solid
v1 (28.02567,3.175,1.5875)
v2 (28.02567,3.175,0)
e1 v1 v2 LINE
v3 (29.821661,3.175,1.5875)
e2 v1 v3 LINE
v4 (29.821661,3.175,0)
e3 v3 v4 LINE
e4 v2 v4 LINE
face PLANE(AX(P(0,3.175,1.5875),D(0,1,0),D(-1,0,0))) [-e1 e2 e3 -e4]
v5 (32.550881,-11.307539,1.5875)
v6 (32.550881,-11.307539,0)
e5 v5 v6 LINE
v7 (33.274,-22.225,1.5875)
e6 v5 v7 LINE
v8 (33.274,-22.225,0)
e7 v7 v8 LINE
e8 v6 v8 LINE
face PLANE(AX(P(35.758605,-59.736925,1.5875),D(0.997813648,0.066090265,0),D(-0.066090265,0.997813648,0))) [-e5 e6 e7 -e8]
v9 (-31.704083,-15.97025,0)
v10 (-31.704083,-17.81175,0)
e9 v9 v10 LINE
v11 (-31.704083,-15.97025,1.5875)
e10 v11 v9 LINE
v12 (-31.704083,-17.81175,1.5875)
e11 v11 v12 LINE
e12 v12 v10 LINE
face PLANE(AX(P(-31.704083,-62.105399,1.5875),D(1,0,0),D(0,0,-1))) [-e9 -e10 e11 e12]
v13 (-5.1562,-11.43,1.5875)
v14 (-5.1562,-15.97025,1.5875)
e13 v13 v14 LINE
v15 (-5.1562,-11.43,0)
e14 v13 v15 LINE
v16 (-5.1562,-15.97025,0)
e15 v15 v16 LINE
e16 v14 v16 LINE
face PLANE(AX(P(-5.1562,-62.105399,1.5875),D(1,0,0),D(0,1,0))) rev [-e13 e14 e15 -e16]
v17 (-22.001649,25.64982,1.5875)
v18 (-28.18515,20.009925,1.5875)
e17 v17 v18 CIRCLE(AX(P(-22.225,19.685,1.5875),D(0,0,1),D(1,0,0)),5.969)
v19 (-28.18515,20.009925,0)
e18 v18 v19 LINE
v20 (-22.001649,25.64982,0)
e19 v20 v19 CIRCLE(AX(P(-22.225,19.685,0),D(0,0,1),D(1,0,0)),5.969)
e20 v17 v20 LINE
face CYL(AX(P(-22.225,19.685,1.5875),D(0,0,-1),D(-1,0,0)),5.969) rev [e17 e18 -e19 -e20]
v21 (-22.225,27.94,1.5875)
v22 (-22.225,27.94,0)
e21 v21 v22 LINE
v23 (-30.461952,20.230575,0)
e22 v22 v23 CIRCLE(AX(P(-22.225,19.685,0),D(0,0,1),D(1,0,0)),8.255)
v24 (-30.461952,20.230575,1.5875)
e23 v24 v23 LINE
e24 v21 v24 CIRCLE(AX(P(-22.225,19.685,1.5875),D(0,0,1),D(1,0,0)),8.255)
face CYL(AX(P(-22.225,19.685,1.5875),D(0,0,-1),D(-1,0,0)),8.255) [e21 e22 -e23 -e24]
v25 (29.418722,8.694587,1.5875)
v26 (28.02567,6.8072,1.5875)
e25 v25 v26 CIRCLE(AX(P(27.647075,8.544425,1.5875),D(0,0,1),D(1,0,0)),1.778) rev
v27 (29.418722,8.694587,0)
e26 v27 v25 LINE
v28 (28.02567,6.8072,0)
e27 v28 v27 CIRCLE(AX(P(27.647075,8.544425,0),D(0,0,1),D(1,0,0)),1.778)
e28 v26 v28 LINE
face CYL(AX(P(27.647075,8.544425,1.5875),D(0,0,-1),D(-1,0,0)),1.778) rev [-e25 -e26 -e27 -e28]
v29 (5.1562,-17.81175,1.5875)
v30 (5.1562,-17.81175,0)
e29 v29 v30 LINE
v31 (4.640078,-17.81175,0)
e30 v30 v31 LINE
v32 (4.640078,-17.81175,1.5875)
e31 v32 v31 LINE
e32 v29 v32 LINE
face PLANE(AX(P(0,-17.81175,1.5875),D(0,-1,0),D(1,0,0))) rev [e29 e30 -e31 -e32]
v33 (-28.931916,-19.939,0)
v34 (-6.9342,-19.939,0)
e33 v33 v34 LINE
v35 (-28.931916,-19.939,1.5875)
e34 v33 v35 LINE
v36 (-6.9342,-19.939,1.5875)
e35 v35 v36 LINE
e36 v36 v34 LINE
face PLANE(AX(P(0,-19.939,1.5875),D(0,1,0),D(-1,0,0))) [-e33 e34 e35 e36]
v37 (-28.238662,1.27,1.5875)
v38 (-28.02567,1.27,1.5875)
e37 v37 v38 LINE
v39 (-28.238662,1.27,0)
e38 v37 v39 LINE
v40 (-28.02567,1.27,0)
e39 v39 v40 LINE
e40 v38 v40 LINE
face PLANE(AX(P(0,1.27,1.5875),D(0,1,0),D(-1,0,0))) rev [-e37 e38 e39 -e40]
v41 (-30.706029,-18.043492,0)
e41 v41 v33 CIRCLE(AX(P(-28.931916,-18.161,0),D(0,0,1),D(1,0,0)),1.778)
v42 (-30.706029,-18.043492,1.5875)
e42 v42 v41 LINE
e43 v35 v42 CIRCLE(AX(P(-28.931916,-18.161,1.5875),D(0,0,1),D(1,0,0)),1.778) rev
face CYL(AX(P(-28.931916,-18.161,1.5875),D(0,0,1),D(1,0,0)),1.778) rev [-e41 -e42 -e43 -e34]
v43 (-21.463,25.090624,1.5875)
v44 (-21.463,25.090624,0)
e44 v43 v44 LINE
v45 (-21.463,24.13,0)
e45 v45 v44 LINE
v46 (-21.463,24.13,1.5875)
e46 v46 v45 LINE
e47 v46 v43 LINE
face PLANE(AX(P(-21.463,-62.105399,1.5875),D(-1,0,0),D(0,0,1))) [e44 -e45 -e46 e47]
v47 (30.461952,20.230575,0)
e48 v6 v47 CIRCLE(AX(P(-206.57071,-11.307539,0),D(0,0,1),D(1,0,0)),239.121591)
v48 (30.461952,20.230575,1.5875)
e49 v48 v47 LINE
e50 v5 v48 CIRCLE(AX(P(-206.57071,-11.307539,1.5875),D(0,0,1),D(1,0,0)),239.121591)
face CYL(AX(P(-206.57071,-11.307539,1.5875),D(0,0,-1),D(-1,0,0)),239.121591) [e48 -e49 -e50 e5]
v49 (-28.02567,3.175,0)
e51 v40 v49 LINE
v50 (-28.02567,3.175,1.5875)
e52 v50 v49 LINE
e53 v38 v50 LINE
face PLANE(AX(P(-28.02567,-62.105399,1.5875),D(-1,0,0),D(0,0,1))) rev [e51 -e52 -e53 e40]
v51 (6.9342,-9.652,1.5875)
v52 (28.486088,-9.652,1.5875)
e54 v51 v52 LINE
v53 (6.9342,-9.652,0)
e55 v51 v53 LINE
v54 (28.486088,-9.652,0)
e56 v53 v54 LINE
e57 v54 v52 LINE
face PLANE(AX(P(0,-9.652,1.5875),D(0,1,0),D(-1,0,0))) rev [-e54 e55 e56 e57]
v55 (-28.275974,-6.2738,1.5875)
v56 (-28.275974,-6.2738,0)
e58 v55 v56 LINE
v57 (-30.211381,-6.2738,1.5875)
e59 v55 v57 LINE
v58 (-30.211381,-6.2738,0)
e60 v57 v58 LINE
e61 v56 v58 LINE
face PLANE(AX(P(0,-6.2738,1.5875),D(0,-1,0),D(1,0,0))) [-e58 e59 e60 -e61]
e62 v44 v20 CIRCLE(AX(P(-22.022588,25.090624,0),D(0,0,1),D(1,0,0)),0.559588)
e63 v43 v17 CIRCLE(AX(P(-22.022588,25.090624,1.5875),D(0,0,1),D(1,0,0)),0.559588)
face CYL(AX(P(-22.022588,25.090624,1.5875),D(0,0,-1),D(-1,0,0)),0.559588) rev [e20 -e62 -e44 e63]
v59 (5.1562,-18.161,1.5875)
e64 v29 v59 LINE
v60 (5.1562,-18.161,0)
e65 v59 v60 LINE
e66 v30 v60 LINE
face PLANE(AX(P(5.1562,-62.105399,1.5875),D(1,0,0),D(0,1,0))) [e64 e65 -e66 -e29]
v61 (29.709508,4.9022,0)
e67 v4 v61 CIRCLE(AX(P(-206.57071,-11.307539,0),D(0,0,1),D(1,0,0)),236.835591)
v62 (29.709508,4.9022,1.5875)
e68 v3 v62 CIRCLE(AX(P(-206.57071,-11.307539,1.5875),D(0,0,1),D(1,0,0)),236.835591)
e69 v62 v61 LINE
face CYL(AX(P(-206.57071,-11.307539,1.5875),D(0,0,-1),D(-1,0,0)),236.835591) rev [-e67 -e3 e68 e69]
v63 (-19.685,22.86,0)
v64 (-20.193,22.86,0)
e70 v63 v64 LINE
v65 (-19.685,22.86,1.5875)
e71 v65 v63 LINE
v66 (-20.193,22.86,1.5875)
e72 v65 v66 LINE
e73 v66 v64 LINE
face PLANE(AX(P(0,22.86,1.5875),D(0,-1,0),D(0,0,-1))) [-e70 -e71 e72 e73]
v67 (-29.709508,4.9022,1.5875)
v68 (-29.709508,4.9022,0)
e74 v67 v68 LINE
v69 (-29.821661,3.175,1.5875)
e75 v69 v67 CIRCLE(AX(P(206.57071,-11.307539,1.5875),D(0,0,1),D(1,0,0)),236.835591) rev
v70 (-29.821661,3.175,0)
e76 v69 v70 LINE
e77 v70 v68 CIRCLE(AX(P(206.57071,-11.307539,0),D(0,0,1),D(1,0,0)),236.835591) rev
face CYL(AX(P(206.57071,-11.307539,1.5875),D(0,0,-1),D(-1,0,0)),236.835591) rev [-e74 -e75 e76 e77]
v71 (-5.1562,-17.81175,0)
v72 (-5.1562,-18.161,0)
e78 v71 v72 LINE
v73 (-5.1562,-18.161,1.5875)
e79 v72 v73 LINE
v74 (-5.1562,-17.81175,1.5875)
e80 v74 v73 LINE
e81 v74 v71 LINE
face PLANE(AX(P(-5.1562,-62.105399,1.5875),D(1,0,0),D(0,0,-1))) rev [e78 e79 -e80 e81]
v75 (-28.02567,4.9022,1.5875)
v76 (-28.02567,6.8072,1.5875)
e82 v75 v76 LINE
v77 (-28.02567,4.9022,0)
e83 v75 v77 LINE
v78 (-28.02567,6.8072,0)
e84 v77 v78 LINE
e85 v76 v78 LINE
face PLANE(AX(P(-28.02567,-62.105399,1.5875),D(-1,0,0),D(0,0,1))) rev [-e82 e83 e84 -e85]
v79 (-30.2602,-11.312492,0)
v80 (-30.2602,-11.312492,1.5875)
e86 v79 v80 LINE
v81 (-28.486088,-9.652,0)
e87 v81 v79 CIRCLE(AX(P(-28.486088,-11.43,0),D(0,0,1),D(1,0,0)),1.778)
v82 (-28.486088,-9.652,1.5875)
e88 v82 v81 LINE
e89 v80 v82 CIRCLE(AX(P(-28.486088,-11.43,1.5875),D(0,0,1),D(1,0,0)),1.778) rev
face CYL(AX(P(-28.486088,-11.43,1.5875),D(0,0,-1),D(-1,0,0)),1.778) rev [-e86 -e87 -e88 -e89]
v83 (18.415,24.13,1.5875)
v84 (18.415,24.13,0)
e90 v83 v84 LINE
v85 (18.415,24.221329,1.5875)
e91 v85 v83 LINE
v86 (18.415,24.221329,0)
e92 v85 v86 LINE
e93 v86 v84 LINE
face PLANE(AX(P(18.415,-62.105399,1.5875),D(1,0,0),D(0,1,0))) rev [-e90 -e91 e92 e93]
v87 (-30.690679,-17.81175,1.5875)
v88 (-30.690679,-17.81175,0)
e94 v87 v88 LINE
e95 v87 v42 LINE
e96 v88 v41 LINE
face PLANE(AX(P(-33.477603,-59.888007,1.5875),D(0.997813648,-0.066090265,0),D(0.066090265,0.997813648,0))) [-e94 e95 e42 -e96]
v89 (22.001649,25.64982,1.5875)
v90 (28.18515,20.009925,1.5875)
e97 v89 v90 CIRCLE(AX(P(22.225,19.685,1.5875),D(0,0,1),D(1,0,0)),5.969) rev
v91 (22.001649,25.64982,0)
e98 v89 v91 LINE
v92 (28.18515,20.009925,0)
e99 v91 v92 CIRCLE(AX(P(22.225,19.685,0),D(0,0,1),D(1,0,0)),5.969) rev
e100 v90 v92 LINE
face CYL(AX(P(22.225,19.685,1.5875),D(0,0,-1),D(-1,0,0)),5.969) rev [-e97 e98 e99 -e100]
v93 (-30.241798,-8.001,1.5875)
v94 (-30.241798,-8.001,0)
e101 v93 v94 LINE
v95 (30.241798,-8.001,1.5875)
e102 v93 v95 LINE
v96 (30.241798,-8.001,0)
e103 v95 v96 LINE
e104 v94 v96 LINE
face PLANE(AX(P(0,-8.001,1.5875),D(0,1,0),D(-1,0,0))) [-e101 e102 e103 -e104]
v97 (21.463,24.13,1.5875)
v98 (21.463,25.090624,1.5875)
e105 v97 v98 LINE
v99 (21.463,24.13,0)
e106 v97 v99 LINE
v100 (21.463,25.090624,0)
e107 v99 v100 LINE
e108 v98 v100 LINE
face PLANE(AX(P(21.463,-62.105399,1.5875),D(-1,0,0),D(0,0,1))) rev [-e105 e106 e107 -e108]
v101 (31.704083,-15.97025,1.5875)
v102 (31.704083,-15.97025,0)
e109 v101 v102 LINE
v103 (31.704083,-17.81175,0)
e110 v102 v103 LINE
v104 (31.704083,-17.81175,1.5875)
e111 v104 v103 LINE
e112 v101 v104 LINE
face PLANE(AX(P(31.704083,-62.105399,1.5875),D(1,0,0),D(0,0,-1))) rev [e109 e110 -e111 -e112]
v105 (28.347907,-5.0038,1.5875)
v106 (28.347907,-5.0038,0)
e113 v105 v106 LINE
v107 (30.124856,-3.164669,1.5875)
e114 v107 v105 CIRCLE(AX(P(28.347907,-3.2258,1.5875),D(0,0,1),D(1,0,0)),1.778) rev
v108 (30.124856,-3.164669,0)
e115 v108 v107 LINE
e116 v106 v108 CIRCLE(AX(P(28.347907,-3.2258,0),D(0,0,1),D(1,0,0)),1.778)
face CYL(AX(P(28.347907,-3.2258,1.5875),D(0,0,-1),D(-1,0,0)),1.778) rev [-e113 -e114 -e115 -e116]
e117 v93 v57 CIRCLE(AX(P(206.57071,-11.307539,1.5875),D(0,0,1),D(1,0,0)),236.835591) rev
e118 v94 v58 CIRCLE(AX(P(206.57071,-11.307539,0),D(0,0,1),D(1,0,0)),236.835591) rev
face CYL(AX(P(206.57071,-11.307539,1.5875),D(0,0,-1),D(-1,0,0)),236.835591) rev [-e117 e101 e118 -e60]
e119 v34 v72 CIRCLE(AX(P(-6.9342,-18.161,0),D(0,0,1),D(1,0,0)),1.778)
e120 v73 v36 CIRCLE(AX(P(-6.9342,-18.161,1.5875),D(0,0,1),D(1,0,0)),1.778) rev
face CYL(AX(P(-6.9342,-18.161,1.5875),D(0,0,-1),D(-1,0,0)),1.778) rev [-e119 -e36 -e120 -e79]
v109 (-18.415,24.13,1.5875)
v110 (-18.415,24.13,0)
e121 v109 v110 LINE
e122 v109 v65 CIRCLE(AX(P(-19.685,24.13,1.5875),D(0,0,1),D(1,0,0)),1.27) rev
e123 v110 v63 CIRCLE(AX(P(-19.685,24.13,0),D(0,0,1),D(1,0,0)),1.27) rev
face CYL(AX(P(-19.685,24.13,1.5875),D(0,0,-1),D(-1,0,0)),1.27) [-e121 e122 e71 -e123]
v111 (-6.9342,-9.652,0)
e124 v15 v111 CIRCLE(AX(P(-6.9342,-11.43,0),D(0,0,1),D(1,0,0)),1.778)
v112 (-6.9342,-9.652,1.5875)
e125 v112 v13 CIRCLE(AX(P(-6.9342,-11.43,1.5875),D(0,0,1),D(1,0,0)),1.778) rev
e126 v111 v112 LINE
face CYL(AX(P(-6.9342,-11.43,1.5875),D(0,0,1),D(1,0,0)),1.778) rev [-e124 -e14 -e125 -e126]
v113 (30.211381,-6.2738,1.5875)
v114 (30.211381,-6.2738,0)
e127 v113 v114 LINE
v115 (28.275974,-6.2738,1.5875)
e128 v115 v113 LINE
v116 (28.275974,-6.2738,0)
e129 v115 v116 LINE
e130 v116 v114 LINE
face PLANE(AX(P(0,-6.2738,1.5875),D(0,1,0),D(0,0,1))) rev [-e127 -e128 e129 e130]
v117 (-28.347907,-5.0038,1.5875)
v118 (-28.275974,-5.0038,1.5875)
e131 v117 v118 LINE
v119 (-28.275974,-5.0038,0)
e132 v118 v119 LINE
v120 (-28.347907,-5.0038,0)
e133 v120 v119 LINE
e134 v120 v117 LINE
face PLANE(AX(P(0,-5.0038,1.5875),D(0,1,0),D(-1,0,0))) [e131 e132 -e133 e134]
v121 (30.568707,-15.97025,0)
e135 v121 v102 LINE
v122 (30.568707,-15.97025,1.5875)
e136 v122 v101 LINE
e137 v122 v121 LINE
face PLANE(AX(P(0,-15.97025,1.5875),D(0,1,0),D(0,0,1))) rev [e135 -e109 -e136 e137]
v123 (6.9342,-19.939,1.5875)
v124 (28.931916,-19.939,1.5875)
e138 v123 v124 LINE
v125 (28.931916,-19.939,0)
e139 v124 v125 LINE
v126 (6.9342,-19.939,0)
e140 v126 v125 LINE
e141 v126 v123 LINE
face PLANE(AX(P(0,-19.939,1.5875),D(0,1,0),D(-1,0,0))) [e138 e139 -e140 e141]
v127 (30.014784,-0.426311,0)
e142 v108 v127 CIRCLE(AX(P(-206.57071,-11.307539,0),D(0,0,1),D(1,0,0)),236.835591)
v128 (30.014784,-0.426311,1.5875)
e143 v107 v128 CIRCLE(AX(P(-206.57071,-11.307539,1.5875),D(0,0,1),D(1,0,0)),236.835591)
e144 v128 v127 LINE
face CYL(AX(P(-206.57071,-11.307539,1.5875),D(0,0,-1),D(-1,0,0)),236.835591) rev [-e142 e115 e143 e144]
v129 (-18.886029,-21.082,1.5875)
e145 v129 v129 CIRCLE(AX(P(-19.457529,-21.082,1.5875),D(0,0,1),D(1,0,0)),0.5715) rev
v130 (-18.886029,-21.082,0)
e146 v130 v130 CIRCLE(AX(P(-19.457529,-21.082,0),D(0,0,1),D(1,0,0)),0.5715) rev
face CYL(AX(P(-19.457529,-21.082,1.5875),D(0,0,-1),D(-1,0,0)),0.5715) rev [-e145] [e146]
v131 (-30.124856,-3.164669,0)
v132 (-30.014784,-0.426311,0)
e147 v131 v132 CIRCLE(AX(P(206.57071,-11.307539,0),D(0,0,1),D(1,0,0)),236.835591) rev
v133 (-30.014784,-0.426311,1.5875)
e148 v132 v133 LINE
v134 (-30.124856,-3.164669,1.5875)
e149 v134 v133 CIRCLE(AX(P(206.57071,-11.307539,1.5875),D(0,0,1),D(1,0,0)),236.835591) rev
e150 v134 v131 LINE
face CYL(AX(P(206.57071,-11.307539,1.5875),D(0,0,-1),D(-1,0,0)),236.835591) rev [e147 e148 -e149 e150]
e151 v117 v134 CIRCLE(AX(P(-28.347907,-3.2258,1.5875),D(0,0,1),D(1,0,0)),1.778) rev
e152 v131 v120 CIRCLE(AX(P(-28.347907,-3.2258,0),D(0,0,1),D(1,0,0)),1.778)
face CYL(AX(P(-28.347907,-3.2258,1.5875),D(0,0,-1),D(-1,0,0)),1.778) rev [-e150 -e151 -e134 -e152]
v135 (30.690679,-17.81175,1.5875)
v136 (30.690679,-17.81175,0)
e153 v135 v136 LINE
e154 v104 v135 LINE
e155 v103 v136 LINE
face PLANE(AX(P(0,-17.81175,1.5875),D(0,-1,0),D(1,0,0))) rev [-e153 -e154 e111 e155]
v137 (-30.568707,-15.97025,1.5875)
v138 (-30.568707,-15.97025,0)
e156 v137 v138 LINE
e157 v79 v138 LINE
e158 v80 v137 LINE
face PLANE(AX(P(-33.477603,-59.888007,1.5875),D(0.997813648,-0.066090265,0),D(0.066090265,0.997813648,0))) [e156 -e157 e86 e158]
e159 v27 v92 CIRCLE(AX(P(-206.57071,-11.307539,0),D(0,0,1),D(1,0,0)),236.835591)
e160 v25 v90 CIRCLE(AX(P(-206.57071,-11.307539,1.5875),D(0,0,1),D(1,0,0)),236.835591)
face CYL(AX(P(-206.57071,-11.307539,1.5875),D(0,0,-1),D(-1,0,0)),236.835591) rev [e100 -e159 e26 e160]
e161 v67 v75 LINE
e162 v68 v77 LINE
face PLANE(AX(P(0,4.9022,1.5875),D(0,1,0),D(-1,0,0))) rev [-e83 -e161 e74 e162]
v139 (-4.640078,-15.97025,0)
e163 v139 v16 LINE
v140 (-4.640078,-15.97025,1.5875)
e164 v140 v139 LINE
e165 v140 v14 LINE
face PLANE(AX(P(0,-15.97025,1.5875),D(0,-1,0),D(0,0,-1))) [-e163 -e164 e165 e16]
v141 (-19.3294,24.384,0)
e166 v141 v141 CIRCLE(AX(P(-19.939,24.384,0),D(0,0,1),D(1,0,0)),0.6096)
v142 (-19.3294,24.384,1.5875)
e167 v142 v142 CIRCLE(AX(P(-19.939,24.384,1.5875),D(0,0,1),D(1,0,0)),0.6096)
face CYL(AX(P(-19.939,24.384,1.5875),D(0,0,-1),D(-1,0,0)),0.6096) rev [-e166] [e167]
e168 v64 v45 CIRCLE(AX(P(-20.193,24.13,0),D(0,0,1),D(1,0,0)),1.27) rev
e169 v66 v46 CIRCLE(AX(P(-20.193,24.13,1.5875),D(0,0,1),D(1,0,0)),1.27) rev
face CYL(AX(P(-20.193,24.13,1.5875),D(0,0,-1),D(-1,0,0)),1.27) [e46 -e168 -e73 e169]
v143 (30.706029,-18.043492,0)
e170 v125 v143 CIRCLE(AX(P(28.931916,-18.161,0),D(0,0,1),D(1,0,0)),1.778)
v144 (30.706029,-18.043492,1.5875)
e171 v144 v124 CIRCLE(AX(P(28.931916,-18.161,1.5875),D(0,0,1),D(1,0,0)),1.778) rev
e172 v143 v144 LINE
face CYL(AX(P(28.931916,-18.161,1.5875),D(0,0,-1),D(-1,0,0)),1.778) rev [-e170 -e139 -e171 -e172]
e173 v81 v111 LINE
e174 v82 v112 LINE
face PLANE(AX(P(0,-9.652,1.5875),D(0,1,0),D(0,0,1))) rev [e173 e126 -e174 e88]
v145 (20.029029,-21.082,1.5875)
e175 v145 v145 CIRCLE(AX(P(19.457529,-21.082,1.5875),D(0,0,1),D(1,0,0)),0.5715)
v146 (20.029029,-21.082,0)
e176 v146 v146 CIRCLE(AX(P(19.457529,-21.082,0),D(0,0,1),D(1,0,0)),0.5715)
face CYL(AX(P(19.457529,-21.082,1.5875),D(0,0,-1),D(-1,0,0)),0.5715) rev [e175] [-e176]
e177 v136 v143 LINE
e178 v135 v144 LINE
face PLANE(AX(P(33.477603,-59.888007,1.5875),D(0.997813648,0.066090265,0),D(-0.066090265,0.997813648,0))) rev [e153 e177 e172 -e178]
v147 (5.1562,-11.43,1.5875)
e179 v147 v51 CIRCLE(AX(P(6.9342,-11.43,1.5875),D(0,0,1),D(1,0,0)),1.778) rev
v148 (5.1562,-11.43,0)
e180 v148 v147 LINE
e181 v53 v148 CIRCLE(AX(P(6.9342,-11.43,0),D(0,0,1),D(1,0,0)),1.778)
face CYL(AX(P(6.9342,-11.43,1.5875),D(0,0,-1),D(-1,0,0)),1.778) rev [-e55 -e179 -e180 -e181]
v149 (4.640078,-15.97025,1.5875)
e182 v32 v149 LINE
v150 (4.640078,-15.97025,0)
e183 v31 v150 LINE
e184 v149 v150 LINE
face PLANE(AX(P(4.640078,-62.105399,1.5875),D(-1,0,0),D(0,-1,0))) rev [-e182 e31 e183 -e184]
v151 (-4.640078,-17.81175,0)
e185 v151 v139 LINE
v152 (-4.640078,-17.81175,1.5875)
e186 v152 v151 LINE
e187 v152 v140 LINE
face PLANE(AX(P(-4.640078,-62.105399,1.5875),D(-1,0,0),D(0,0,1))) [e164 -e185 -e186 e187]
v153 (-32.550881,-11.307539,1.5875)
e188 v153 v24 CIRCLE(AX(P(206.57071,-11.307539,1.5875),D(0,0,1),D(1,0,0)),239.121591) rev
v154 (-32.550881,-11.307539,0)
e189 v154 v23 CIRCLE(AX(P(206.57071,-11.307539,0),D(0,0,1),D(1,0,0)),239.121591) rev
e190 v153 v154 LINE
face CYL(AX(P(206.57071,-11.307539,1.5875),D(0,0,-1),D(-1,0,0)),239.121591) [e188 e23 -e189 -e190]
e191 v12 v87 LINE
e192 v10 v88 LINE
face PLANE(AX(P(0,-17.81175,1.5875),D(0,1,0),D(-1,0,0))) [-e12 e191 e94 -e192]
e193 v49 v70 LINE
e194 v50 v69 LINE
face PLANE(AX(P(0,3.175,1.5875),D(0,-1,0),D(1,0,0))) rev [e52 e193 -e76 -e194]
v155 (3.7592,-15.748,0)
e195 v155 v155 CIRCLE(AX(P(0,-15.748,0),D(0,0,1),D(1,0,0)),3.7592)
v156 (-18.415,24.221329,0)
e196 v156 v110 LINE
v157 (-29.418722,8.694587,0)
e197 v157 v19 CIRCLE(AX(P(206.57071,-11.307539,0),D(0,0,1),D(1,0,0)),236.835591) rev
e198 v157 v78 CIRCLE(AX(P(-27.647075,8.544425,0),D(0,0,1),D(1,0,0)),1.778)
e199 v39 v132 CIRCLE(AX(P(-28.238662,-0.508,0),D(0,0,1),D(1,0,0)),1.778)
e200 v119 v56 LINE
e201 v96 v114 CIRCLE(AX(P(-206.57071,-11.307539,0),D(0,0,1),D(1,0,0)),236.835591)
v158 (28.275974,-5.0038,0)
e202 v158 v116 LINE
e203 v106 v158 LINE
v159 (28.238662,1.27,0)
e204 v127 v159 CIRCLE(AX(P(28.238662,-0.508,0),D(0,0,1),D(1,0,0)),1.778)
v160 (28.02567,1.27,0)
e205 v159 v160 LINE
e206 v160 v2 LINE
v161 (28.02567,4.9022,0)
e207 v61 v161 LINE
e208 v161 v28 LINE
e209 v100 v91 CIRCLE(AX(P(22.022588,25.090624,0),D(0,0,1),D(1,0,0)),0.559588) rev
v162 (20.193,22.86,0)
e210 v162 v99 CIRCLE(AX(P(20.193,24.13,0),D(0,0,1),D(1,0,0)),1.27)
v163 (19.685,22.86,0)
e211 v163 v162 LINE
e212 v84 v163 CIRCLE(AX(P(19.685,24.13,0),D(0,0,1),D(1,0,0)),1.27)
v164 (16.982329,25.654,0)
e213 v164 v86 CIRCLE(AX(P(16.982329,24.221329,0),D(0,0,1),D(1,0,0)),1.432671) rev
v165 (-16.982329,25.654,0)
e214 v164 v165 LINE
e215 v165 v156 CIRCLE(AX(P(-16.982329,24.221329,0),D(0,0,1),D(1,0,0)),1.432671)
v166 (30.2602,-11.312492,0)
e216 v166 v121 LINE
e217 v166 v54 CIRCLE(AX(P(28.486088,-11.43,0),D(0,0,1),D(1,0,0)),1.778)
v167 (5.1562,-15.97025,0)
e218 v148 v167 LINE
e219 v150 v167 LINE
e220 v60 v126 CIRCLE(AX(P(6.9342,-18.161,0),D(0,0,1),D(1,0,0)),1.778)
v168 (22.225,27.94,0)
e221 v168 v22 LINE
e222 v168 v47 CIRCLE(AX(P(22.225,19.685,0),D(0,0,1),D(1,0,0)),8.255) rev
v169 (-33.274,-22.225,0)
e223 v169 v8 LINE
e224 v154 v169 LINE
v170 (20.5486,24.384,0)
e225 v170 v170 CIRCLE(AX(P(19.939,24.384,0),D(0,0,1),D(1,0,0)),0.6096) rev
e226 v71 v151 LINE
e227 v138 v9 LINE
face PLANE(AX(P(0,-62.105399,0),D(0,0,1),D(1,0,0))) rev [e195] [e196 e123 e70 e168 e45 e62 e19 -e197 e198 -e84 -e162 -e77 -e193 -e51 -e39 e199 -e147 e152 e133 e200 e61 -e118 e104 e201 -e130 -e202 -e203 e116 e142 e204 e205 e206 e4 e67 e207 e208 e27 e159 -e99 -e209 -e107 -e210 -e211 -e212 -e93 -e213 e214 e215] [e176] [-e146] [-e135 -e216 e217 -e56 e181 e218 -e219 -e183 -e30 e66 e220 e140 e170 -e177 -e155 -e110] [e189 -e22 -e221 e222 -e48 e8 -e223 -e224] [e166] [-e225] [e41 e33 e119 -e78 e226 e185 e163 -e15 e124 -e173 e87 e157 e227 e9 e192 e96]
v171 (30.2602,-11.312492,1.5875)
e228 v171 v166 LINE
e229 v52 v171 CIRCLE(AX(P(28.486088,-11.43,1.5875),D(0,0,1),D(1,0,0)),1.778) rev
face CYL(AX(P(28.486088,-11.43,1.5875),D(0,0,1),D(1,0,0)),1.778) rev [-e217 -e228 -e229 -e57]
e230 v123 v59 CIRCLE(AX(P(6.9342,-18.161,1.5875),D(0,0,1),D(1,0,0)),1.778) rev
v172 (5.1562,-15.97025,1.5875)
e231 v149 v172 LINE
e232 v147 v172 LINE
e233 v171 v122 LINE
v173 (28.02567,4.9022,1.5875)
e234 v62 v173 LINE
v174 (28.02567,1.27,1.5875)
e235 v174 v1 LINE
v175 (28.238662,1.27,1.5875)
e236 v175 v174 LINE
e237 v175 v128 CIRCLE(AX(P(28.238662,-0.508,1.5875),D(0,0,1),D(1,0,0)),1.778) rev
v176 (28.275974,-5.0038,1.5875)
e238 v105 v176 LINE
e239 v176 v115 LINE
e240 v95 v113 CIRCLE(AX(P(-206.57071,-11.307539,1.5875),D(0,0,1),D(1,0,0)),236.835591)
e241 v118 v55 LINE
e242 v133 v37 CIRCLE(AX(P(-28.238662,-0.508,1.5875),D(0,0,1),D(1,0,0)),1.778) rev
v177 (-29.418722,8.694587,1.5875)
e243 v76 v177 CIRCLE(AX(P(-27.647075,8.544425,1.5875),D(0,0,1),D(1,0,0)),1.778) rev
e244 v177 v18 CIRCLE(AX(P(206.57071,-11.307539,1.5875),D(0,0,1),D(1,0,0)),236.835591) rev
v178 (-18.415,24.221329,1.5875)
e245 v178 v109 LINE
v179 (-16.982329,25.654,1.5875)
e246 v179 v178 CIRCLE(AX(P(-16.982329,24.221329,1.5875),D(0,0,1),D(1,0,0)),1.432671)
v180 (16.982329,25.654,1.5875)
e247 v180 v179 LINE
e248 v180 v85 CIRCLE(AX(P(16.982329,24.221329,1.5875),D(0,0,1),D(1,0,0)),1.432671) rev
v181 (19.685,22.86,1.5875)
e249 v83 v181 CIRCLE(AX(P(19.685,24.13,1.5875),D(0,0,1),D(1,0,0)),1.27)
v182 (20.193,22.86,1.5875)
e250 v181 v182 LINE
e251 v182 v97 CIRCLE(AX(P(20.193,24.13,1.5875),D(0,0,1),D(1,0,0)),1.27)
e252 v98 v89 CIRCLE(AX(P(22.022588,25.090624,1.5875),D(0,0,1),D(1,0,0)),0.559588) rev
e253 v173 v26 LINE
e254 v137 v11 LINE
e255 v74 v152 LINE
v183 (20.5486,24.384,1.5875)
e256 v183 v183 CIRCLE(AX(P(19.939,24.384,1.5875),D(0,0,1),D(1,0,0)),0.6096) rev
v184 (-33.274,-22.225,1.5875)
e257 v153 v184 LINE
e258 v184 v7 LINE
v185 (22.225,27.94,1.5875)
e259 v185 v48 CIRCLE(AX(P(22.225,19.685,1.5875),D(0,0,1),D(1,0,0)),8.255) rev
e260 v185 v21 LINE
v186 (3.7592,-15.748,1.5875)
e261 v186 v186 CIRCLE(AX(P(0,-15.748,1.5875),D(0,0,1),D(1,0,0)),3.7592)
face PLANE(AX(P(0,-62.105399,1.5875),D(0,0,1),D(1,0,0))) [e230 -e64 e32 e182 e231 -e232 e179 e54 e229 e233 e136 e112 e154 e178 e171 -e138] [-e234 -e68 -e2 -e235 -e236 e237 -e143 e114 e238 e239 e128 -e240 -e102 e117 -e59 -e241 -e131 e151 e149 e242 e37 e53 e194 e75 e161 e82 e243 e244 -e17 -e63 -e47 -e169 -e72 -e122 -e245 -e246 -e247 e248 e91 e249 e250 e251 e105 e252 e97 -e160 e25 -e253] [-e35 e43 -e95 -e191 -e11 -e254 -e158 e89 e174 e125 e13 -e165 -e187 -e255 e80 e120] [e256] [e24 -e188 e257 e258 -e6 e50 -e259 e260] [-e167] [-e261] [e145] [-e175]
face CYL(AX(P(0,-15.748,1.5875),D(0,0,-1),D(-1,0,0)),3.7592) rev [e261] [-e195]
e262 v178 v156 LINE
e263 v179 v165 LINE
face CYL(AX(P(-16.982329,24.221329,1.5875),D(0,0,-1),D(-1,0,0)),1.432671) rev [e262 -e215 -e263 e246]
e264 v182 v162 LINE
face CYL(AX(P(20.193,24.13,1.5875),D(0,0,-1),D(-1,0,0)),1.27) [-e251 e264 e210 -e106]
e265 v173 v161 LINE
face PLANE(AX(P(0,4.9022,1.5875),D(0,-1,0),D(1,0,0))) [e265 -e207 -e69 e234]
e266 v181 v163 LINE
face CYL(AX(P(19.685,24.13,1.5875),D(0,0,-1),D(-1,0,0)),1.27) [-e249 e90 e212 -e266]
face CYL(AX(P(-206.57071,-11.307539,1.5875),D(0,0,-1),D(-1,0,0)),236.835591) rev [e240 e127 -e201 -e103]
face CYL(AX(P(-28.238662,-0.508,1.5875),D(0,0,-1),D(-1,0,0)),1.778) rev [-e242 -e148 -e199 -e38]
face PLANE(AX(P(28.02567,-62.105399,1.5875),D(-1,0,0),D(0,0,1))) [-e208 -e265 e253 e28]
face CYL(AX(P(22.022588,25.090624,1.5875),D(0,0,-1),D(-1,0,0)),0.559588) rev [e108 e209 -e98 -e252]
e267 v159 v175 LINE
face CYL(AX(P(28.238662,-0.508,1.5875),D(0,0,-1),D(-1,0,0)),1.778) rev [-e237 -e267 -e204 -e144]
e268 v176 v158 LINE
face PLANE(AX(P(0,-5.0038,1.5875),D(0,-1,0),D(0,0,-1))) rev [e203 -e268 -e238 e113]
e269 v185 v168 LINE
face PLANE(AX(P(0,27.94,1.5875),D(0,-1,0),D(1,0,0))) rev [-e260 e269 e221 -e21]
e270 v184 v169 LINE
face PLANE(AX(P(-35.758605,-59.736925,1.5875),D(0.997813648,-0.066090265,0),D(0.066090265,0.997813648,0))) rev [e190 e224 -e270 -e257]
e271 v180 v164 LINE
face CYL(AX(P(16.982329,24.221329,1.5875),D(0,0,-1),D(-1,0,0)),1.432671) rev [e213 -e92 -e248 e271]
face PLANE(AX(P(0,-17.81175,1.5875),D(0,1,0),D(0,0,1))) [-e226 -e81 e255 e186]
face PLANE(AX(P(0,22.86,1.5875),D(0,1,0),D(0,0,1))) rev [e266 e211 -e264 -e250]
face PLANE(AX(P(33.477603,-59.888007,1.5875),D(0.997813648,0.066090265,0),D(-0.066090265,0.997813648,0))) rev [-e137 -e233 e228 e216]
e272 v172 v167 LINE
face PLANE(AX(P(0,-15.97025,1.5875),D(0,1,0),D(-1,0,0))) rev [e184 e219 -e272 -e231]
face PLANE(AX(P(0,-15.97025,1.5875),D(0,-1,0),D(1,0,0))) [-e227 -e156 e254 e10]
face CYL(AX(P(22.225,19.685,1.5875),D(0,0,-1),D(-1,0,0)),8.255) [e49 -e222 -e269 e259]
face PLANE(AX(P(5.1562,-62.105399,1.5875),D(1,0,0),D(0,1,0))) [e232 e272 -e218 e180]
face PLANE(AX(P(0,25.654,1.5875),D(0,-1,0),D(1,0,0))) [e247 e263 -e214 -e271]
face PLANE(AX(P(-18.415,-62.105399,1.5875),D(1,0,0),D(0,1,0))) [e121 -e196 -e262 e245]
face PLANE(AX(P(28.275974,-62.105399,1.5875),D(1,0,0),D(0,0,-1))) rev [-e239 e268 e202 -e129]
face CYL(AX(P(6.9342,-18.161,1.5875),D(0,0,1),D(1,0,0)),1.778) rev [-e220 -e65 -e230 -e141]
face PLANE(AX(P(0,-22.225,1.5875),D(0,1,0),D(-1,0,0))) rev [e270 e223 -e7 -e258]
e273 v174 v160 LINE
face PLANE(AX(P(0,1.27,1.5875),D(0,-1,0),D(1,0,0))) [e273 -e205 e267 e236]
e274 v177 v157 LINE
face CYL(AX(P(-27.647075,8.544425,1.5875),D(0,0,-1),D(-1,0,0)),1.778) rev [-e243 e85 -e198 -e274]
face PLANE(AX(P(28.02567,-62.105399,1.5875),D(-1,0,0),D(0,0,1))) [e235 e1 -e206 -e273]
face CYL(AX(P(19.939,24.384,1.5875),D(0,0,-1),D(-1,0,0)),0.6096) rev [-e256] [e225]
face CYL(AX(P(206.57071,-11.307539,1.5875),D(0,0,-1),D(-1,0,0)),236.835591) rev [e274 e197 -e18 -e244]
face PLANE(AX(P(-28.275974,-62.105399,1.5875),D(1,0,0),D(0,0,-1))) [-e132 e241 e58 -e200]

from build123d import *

# Parameters (mm, degrees)
SKETCH1_R           = 3.7592
SKETCH1_R_2         = 0.5715
SKETCH1_R_3         = 0.6096
BOSS_EXTRUDE1_DEPTH = 1.5875
FILLET1_R           = 1.778


with BuildPart() as part:
    # Sketch1 → Boss-Extrude1 (new body)
    with BuildSketch(Plane.XY):
        with BuildLine():
            Line((32.550881113, -11.307538914), (33.274, -22.225))
            Line((33.274, -22.225), (-33.274, -22.225))
            Line((-33.274, -22.225), (-32.550881113, -11.307538914))
            ThreePointArc((-32.550881113, -11.307538914), (-32.028077235, 4.496070358), (-30.461951667, 20.230575137))
            ThreePointArc((-30.461951667, 20.230575137), (-27.865979624, 25.711970539), (-22.225, 27.94))
            Line((-22.225, 27.94), (22.225, 27.94))
            ThreePointArc((22.225, 27.94), (27.865979624, 25.711970539), (30.461951667, 20.230575137))
            ThreePointArc((30.461951667, 20.230575137), (32.028077235, 4.496070358), (32.550881113, -11.307538914))
        make_face()
        with Locations((0, -15.748)):
            Circle(SKETCH1_R, mode=Mode.SUBTRACT)
        with Locations((19.457528855, -21.082)):
            Circle(SKETCH1_R_2, mode=Mode.SUBTRACT)
        with Locations((-19.939, 24.384)):
            Circle(SKETCH1_R_3, mode=Mode.SUBTRACT)
        with Locations((19.939, 24.384)):
            Circle(SKETCH1_R_3, mode=Mode.SUBTRACT)
        with Locations((-19.457528855, -21.082)):
            Circle(SKETCH1_R_2, mode=Mode.SUBTRACT)
        with BuildLine():
            Line((16.982329273, 25.654), (-16.982329273, 25.654))
            ThreePointArc((-16.982329273, 25.654), (-17.995380459, 25.234380459), (-18.415, 24.221329273))
            Line((-18.415, 24.221329273), (-18.415, 24.13))
            ThreePointArc((-18.415, 24.13), (-18.786974388, 23.231974388), (-19.685, 22.86))
            Line((-19.685, 22.86), (-20.193, 22.86))
            ThreePointArc((-20.193, 22.86), (-21.091025612, 23.231974388), (-21.463, 24.13))
            Line((-21.463, 24.13), (-21.463, 25.09062388))
            ThreePointArc((-21.463, 25.09062388), (-21.619564426, 25.478838601), (-22.001648865, 25.649819802))
            ThreePointArc((-22.001648865, 25.649819802), (-26.24741448, 24.095118224), (-28.185149732, 20.00992487))
            ThreePointArc((-28.185149732, 20.00992487), (-28.97064802, 13.418275107), (-29.571097928, 6.8072))
            Line((-29.571097928, 6.8072), (-28.02566998, 6.8072))
            Line((-28.02566998, 6.8072), (-28.02566998, 4.9022))
            Line((-28.02566998, 4.9022), (-29.709508346, 4.9022))
            ThreePointArc((-29.709508346, 4.9022), (-29.767162744, 4.038702455), (-29.821661459, 3.175))
            Line((-29.821661459, 3.175), (-28.02566998, 3.175))
            Line((-28.02566998, 3.175), (-28.02566998, 1.27))
            Line((-28.02566998, 1.27), (-29.93066998, 1.27))
            ThreePointArc((-29.93066998, 1.27), (-30.076613863, -1.86607048), (-30.180974457, -5.0038))
            Line((-30.180974457, -5.0038), (-28.275974457, -5.0038))
            Line((-28.275974457, -5.0038), (-28.275974457, -6.2738))
            Line((-28.275974457, -6.2738), (-30.211381152, -6.2738))
            ThreePointArc((-30.211381152, -6.2738), (-30.228164423, -7.137372267), (-30.241798154, -8.001))
            Line((-30.241798154, -8.001), (30.241798154, -8.001))
            ThreePointArc((30.241798154, -8.001), (30.228164423, -7.137372267), (30.211381152, -6.2738))
            Line((30.211381152, -6.2738), (28.275974457, -6.2738))
            Line((28.275974457, -6.2738), (28.275974457, -5.0038))
            Line((28.275974457, -5.0038), (30.180974457, -5.0038))
            ThreePointArc((30.180974457, -5.0038), (30.076613863, -1.86607048), (29.93066998, 1.27))
            Line((29.93066998, 1.27), (28.02566998, 1.27))
            Line((28.02566998, 1.27), (28.02566998, 3.175))
            Line((28.02566998, 3.175), (29.821661459, 3.175))
            ThreePointArc((29.821661459, 3.175), (29.767162744, 4.038702455), (29.709508346, 4.9022))
            Line((29.709508346, 4.9022), (28.02566998, 4.9022))
            Line((28.02566998, 4.9022), (28.02566998, 6.8072))
            Line((28.02566998, 6.8072), (29.571097928, 6.8072))
            ThreePointArc((29.571097928, 6.8072), (28.97064802, 13.418275107), (28.185149732, 20.00992487))
            ThreePointArc((28.185149732, 20.00992487), (26.24741448, 24.095118224), (22.001648865, 25.649819802))
            ThreePointArc((22.001648865, 25.649819802), (21.619564426, 25.478838601), (21.463, 25.09062388))
            Line((21.463, 25.09062388), (21.463, 24.13))
            ThreePointArc((21.463, 24.13), (21.091025612, 23.231974388), (20.193, 22.86))
            Line((20.193, 22.86), (19.685, 22.86))
            ThreePointArc((19.685, 22.86), (18.786974388, 23.231974388), (18.415, 24.13))
            Line((18.415, 24.13), (18.415, 24.221329273))
            ThreePointArc((18.415, 24.221329273), (17.995380459, 25.234380459), (16.982329273, 25.654))
        make_face(mode=Mode.SUBTRACT)
        Polygon((30.150217413, -9.652), (30.568707194, -15.97025), (30.330164629, -15.97025), (31.704083289, -15.97025), (31.704083289, -17.81175), (30.690679091, -17.81175), (30.83157766, -19.939), (19.965528855, -19.939), (18.949528855, -19.939), (5.1562, -19.939), (5.1562, -17.81175), (4.640078489, -17.81175), (4.640078489, -15.97025), (5.1562, -15.97025), (5.1562, -9.652), align=None, mode=Mode.SUBTRACT)
        Polygon((-30.83157766, -19.939), (-19.965528855, -19.939), (-18.949528855, -19.939), (-5.1562, -19.939), (-5.1562, -17.81175), (-4.640078489, -17.81175), (-4.640078489, -15.97025), (-5.1562, -15.97025), (-5.1562, -9.652), (-30.150217413, -9.652), (-30.568707194, -15.97025), (-31.704083289, -15.97025), (-31.704083289, -17.81175), (-30.690679091, -17.81175), align=None, mode=Mode.SUBTRACT)
    extrude(amount=BOSS_EXTRUDE1_DEPTH)

    # Fillet1
    # the kernel refuses this fillet: 1.778 mm, written as the material it adds along each edge
    with BuildSketch(Plane(origin=(-30.180974457, -5.0038, 0), x_dir=(1, 0, 0), z_dir=(0, 0, 1))) as fillet1_piece_1:
        with BuildLine():
            CenterArc((1.833067409, 1.778), FILLET1_R, 178.029670908, 91.970329092)
            Line((0.056118624, 1.839131111), (0.020579648, 1.840353734))
            ThreePointArc((0.020579648, 1.840353734), (-0.009270189, 0.920704615), (-0.035547402, 0.000946483))
            Line((-0.035547402, 0.000946483), (0, -0.03556))
            Line((0, -0.03556), (1.833067409, -0.03556))
            Line((1.833067409, -0.03556), (1.833067409, 0))
        make_face()
    extrude(amount=1.5875)
    with BuildSketch(Plane(origin=(-29.93066998, 1.27, 0), x_dir=(-0.04952574354141493, -0.9987728474115973, 0), z_dir=(0, 0, 1))) as fillet1_piece_2:
        with BuildLine():
            CenterArc((1.692020161, 1.777988571), FILLET1_R, 182.838777382, 87.366662802)
            Line((-0.083797962, 1.689931798), (-0.119314324, 1.688170663))
            Line((-0.119314324, 1.688170663), (-0.035516362, -0.001761135))
            Line((-0.035516362, -0.001761135), (-0.000127504, -0.035559771))
            ThreePointArc((-0.000127504, -0.035559771), (0.849197679, -0.037082446), (1.698522862, -0.035559771))
            Line((1.698522862, -0.035559771), (1.698395358, 0))
        make_face()
    extrude(amount=1.5875)
    with BuildSketch(Plane(origin=(-29.571097928, 6.8072, 0), x_dir=(1, 0, 0), z_dir=(0, 0, 1))) as fillet1_piece_3:
        with BuildLine():
            CenterArc((1.924023206, 1.737224692), FILLET1_R, 175.155271265, 82.550426931)
            Line((0.152375588, 1.887387004), (0.116942636, 1.89039025))
            ThreePointArc((0.116942636, 1.89039025), (0.038856877, 0.946707362), (-0.035455831, 0.002719862))
            Line((-0.035455831, 0.002719862), (0, -0.03556))
            ThreePointArc((0, -0.03556), (0.772713974, -0.03556), (1.537856043, -0.034744494))
            Line((1.537856043, -0.034744494), (1.545427948, 0))
        make_face()
    extrude(amount=1.5875)
    with BuildSketch(Plane(origin=(29.93066998, 1.27, 0), x_dir=(0.04952574354144595, -0.9987728474115959, 0), z_dir=(0, 0, 1))) as fillet1_piece_4:
        with BuildLine():
            CenterArc((1.692020161, -1.777988571), FILLET1_R, 89.794559817, 87.366662802)
            Line((-0.083797962, -1.689931798), (-0.119314324, -1.688170663))
            Line((-0.119314324, -1.688170663), (-0.035516362, 0.001761135))
            Line((-0.035516362, 0.001761135), (-0.000127504, 0.035559771))
            ThreePointArc((-0.000127504, 0.035559771), (0.849197679, 0.037082446), (1.698522862, 0.035559771))
            Line((1.698522862, 0.035559771), (1.698395358, 0))
        make_face()
    extrude(amount=1.5875)
    with BuildSketch(Plane(origin=(29.571097928, 6.8072, 0), x_dir=(-0.08047179326546709, 0.9967568863512506, 0), z_dir=(0, 0, 1))) as fillet1_piece_5:
        with BuildLine():
            CenterArc((1.886420273, 1.777985793), FILLET1_R, 187.678616869, 82.550426931)
            Line((0.124363358, 1.540415949), (0.08912222, 1.535664552))
            ThreePointArc((0.08912222, 1.535664552), (0.026737004, 0.773069552), (-0.035444675, 0.002861577))
            Line((-0.035444675, 0.002861577), (-0.000142153, -0.035559716))
            ThreePointArc((-0.000142153, -0.035559716), (0.946763965, -0.037452379), (1.893670084, -0.035559716))
            Line((1.893670084, -0.035559716), (1.89352793, 0))
        make_face()
    extrude(amount=1.5875)
    with BuildSketch(Plane(origin=(30.180974457, -5.0038, 0), x_dir=(-0.03049946566100157, 0.9995347830838072, 0), z_dir=(0, 0, 1))) as fillet1_piece_6:
        with BuildLine():
            CenterArc((1.833080421, 1.777986585), FILLET1_R, 178.252238302, 91.970329092)
            Line((0.055907577, 1.832214635), (0.02036412, 1.833299196))
            Line((0.02036412, 1.833299196), (-0.035543457, 0.001084561))
            Line((-0.035543457, 0.001084561), (-0.000138134, -0.035559732))
            ThreePointArc((-0.000138134, -0.035559732), (0.919993552, -0.037346875), (1.840125238, -0.035559732))
            Line((1.840125238, -0.035559732), (1.839987105, 0))
        make_face()
    extrude(amount=1.5875)
    with BuildSketch(Plane(origin=(-30.150217413, -9.652, 0), x_dir=(-0.06609026487531962, -0.9978136483776467, 0), z_dir=(0, 0, 1))) as fillet1_piece_7:
        with BuildLine():
            CenterArc((FILLET1_R * 0.935956064184, FILLET1_R), FILLET1_R, 183.789455341, 86.210544659)
            Line((-FILLET1_R * 0.0618575841936, FILLET1_R * 0.933909735125), (-FILLET1_R * 0.0818138571611, FILLET1_R * 0.932587929827))
            Line((-FILLET1_R * 0.0818138571611, FILLET1_R * 0.932587929827), (-FILLET1_R * 0.0187191212837, -FILLET1_R * 0.02))
            Line((-FILLET1_R * 0.0187191212837, -FILLET1_R * 0.02), (FILLET1_R * 0.935956064184, -FILLET1_R * 0.02))
            Line((FILLET1_R * 0.935956064184, -FILLET1_R * 0.02), (FILLET1_R * 0.935956064184, 0))
        make_face()
    extrude(amount=1.5875)
    with BuildSketch(Plane(origin=(-5.1562, -9.652, 0), x_dir=(-1, 0, 0), z_dir=(0, 0, 1)), Plane(origin=(5.1562, -9.652, 0), x_dir=(0, -1, 0), z_dir=(0, 0, 1)), Plane(origin=(-5.1562, -19.939, 0), x_dir=(0, 1, 0), z_dir=(0, 0, 1)), Plane(origin=(5.1562, -19.939, 0), x_dir=(1, 0, 0), z_dir=(0, 0, 1))) as fillet1_piece_8:
        with BuildLine():
            CenterArc((FILLET1_R, FILLET1_R), FILLET1_R, 180, 90)
            Line((0, FILLET1_R), (-FILLET1_R * 0.02, FILLET1_R))
            Line((-FILLET1_R * 0.02, FILLET1_R), (-FILLET1_R * 0.02, -FILLET1_R * 0.02))
            Line((-FILLET1_R * 0.02, -FILLET1_R * 0.02), (FILLET1_R, -FILLET1_R * 0.02))
            Line((FILLET1_R, -FILLET1_R * 0.02), (FILLET1_R, 0))
        make_face()
    extrude(amount=1.5875)
    with BuildSketch(Plane(origin=(30.150217413, -9.652, 0), x_dir=(0.06609026487531962, -0.9978136483776467, 0), z_dir=(0, 0, 1))) as fillet1_piece_9:
        with BuildLine():
            CenterArc((FILLET1_R * 0.935956064184, -FILLET1_R), FILLET1_R, 90, 86.210544659)
            Line((-FILLET1_R * 0.0618575841936, -FILLET1_R * 0.933909735125), (-FILLET1_R * 0.0818138571611, -FILLET1_R * 0.932587929827))
            Line((-FILLET1_R * 0.0818138571611, -FILLET1_R * 0.932587929827), (-FILLET1_R * 0.0187191212837, FILLET1_R * 0.02))
            Line((-FILLET1_R * 0.0187191212837, FILLET1_R * 0.02), (FILLET1_R * 0.935956064184, FILLET1_R * 0.02))
            Line((FILLET1_R * 0.935956064184, FILLET1_R * 0.02), (FILLET1_R * 0.935956064184, 0))
        make_face()
    extrude(amount=1.5875)
    with BuildSketch(Plane(origin=(-30.83157766, -19.939, 0), x_dir=(0.06609026487531591, 0.9978136483776471, 0), z_dir=(0, 0, 1))) as fillet1_piece_10:
        with BuildLine():
            CenterArc((FILLET1_R * 1.06842622028, -FILLET1_R), FILLET1_R, 90, 93.789455341)
            Line((FILLET1_R * 0.0706125718977, -FILLET1_R * 1.06609026488), (FILLET1_R * 0.0506562989302, -FILLET1_R * 1.06741207017))
            Line((FILLET1_R * 0.0506562989302, -FILLET1_R * 1.06741207017), (-FILLET1_R * 0.0213685244055, FILLET1_R * 0.02))
            Line((-FILLET1_R * 0.0213685244055, FILLET1_R * 0.02), (FILLET1_R * 1.06842622028, FILLET1_R * 0.02))
            Line((FILLET1_R * 1.06842622028, FILLET1_R * 0.02), (FILLET1_R * 1.06842622028, 0))
        make_face()
    extrude(amount=1.5875)
    with BuildSketch(Plane(origin=(30.83157766, -19.939, 0), x_dir=(-0.06609026487531046, 0.9978136483776474, 0), z_dir=(0, 0, 1))) as fillet1_piece_11:
        with BuildLine():
            CenterArc((FILLET1_R * 1.06842622028, FILLET1_R), FILLET1_R, 176.210544659, 93.789455341)
            Line((FILLET1_R * 0.0706125718977, FILLET1_R * 1.06609026488), (FILLET1_R * 0.0506562989302, FILLET1_R * 1.06741207017))
            Line((FILLET1_R * 0.0506562989302, FILLET1_R * 1.06741207017), (-FILLET1_R * 0.0213685244055, -FILLET1_R * 0.02))
            Line((-FILLET1_R * 0.0213685244055, -FILLET1_R * 0.02), (FILLET1_R * 1.06842622028, -FILLET1_R * 0.02))
            Line((FILLET1_R * 1.06842622028, -FILLET1_R * 0.02), (FILLET1_R * 1.06842622028, 0))
        make_face()
    extrude(amount=1.5875)


solid = part.part
